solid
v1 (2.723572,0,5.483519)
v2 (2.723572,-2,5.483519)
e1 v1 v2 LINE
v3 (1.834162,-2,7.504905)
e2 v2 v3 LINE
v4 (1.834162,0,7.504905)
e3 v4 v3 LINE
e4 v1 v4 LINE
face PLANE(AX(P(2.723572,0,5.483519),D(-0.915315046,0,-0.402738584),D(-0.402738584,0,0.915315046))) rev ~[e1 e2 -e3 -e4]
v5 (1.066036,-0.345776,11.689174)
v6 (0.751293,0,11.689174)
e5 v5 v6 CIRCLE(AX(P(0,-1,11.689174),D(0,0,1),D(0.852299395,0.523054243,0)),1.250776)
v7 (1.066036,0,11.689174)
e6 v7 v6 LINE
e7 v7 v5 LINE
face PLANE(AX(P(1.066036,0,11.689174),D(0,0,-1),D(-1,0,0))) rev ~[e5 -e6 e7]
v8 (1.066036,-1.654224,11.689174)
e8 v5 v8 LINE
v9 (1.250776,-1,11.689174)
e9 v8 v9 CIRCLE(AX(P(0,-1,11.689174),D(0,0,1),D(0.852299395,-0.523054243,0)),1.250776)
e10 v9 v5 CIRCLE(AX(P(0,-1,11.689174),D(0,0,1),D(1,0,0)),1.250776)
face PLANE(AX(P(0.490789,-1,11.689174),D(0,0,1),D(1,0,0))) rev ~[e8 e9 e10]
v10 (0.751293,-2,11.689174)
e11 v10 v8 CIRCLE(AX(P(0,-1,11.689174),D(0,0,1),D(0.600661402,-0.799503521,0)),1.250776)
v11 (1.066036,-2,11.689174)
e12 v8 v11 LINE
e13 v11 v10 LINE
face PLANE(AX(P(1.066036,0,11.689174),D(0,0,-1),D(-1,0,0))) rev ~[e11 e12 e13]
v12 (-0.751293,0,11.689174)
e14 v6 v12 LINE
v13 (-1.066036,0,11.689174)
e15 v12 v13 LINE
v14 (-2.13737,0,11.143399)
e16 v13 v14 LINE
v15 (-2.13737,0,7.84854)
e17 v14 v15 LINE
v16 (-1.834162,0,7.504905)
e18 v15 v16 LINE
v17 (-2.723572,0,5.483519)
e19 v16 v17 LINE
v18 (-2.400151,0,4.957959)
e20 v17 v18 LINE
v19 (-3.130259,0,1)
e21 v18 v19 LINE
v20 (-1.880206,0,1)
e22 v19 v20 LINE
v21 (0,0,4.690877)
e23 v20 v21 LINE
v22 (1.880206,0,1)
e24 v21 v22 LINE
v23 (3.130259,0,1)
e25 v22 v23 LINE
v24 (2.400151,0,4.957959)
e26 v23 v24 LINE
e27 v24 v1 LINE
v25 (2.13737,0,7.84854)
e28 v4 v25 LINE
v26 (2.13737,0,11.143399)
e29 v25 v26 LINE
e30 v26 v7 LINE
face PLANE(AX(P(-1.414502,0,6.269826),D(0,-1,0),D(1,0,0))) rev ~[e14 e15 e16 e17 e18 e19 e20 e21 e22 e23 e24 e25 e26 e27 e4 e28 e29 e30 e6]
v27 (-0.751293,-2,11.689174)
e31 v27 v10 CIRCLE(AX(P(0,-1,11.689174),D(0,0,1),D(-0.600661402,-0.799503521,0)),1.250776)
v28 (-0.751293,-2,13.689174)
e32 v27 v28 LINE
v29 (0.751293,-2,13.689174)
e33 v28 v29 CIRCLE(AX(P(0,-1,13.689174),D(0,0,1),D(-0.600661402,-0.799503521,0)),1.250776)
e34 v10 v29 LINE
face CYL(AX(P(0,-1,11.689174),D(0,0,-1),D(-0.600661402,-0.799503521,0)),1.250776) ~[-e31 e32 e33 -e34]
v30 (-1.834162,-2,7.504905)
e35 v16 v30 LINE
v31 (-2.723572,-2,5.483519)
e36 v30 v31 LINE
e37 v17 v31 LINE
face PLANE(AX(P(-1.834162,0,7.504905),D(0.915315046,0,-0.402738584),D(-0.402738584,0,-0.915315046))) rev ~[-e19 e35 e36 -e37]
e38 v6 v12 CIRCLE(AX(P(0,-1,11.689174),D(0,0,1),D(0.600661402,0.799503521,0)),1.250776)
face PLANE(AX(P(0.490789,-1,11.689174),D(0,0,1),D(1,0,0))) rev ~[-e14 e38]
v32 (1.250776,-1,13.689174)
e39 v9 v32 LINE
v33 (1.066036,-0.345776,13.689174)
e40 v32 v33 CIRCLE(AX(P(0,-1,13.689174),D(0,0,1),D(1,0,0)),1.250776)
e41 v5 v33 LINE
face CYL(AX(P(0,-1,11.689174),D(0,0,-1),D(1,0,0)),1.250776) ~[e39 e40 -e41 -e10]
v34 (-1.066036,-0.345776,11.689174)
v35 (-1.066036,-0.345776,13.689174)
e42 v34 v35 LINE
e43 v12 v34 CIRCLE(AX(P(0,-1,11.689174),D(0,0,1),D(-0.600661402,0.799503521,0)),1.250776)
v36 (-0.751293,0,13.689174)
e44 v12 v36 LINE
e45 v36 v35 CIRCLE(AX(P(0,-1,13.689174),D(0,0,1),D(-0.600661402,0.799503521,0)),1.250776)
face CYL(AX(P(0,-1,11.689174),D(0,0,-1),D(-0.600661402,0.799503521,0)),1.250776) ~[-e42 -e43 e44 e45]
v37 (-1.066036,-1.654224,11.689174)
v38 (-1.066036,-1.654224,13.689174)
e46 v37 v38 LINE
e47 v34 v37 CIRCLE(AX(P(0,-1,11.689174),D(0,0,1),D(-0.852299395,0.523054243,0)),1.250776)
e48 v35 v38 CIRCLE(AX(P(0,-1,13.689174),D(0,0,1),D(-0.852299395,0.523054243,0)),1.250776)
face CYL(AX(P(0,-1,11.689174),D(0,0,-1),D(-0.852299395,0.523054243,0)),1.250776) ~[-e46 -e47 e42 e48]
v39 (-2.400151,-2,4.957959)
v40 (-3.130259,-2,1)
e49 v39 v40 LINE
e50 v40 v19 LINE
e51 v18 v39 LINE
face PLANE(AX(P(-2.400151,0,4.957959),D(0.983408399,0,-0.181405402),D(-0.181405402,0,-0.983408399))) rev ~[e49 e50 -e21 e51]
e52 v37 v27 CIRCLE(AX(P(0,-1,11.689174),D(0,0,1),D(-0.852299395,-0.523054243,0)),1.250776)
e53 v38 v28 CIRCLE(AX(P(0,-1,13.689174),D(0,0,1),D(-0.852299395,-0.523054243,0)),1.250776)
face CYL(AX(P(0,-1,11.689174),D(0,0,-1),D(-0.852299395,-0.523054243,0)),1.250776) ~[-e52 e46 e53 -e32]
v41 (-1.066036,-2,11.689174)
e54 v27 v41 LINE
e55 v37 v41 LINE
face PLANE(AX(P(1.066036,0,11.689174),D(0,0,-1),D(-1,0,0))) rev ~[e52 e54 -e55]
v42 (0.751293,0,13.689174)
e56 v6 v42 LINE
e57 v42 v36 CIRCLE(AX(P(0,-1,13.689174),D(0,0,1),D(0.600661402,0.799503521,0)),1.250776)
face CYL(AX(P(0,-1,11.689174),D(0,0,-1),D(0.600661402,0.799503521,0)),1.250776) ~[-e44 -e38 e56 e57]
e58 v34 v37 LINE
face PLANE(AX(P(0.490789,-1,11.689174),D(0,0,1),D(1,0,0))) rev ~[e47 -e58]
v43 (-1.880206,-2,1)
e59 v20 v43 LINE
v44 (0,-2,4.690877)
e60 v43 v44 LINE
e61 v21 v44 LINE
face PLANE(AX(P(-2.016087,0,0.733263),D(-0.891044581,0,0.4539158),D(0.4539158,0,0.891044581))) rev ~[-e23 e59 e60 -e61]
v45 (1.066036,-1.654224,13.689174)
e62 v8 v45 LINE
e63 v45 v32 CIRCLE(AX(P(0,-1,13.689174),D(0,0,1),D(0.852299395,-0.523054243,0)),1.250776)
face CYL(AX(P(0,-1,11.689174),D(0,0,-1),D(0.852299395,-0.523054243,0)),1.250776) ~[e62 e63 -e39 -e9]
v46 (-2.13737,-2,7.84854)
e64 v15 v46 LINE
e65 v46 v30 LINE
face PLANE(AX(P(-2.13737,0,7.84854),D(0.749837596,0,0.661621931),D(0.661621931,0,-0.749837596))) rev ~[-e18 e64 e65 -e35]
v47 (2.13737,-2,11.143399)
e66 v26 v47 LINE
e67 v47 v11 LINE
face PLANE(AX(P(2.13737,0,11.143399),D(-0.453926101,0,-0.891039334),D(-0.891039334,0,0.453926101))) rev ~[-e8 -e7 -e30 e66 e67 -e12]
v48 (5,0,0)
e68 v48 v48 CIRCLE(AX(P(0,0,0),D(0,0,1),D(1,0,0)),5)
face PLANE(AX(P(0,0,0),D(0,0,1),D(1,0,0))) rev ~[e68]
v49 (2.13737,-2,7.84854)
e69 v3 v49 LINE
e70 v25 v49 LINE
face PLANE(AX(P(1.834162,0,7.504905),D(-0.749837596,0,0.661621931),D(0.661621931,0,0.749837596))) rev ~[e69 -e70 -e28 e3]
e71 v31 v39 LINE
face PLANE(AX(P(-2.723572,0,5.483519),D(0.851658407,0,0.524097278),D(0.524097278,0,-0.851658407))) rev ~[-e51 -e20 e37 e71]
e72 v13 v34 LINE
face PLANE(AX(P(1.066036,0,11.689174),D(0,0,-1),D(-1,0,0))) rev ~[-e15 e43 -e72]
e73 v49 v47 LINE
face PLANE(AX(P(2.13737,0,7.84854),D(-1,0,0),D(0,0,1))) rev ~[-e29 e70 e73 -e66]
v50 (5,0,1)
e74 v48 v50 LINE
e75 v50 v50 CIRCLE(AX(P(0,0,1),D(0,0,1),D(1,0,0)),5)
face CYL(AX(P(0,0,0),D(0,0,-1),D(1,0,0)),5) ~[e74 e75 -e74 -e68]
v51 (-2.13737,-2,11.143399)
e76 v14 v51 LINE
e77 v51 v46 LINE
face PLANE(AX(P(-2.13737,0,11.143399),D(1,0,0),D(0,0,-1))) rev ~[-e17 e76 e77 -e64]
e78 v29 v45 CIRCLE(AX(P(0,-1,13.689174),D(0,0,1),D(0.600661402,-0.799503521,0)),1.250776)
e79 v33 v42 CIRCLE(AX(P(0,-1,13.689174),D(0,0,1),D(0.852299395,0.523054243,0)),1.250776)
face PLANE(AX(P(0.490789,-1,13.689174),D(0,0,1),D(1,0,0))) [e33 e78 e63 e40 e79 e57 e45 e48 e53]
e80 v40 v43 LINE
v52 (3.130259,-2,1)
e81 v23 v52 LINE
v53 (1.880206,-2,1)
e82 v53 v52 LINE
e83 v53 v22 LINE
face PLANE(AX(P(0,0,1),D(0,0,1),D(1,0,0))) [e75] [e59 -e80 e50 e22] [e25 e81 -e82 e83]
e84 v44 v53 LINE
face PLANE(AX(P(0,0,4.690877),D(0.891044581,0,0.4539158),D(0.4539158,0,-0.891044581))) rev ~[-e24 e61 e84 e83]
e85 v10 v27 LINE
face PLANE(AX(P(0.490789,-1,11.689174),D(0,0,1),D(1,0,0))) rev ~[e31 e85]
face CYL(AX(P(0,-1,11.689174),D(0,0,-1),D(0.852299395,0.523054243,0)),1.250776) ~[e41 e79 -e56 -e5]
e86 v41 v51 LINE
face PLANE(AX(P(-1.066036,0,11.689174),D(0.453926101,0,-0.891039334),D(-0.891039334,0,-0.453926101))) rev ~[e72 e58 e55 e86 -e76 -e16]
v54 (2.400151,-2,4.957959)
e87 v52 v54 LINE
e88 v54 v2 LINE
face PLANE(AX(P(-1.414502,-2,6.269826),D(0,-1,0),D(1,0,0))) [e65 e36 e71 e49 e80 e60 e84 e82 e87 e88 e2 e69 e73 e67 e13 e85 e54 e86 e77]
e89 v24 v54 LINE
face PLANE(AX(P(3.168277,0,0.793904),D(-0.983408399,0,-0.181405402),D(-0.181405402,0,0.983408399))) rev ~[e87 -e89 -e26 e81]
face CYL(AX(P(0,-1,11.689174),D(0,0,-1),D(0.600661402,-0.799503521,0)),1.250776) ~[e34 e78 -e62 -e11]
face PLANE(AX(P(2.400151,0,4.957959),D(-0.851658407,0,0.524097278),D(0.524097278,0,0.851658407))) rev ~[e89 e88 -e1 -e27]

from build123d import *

# Parameters (mm, degrees)
F0_R     = 5
F1_DEPTH = 1
F3_DEPTH = 2
F5_DEPTH = 2


with BuildPart() as f1:
    # F0 (on Top) → F1 (new body)
    with BuildSketch(Plane.XY):
        Circle(F0_R)
    extrude(amount=F1_DEPTH)

    # F2 (on Front) → F3 (join)
    with BuildSketch(Plane.XZ):
        Polygon((-2.4001505226, 4.9579590559), (-3.1682769768, 0.7939044153), (-2.0160870627, 0.7332628593), (0, 4.6908766963), (0, 11.689173989), (-1.0660358239, 11.689173989), (-2.1373701748, 11.1433994025), (-2.1373701748, 7.848540321), (-1.8341623945, 7.5049051084), (-2.7235720772, 5.4835192859), align=None)
        Polygon((0, 11.689173989), (0, 4.6908766963), (2.0160870627, 0.7332628593), (3.1682769768, 0.7939044153), (2.4001505226, 4.9579590559), (2.7235720772, 5.4835192859), (1.8341623945, 7.5049051084), (2.1373701748, 7.848540321), (2.1373701748, 11.1433994025), (1.0660358239, 11.689173989), align=None)
    extrude(amount=F3_DEPTH)

    # F4 (on face) → F5 (join)
    with BuildSketch(Plane.XY.offset(11.689173989)):
        with BuildLine():
            Line((0.7512930037, 0), (0, 0))
            Line((0, 0), (0, -2))
            Line((0, -2), (0.7512930037, -2))
            ThreePointArc((0.7512930037, -2), (0.9249655721, -1.8419500388), (1.0660358239, -1.6542238146))
            Line((1.0660358239, -1.6542238146), (1.0660358239, -0.3457761854))
            ThreePointArc((1.0660358239, -0.3457761854), (0.9249655721, -0.1580499612), (0.7512930037, 0))
        make_face()
        with BuildLine():
            Line((-0.7512930037, 0), (0, 0))
            Line((0, 0), (0.7512930037, 0))
            ThreePointArc((0.7512930037, 0), (0, 0.25077623), (-0.7512930037, 0))
        make_face()
        with BuildLine():
            Line((0, -2), (0, 0))
            Line((0, 0), (-0.7512930037, 0))
            ThreePointArc((-0.7512930037, 0), (-0.9249655721, -0.1580499612), (-1.0660358239, -0.3457761854))
            Line((-1.0660358239, -0.3457761854), (-1.0660358239, -1.6542238146))
            ThreePointArc((-1.0660358239, -1.6542238146), (-0.9249655721, -1.8419500388), (-0.7512930037, -2))
            Line((-0.7512930037, -2), (0, -2))
        make_face()
        with BuildLine():
            Line((0.7512930037, -2), (0, -2))
            Line((0, -2), (-0.7512930037, -2))
            ThreePointArc((-0.7512930037, -2), (0, -2.25077623), (0.7512930037, -2))
        make_face()
        with BuildLine():
            ThreePointArc((1.25077623, -1), (1.2037054138, -0.6600964044), (1.0660358239, -0.3457761854))
            Line((1.0660358239, -0.3457761854), (1.0660358239, -1.6542238146))
            ThreePointArc((1.0660358239, -1.6542238146), (1.2037054138, -1.3399035956), (1.25077623, -1))
        make_face()
        with BuildLine():
            Line((-1.0660358239, -1.6542238146), (-1.0660358239, -0.3457761854))
            ThreePointArc((-1.0660358239, -0.3457761854), (-1.25077623, -1), (-1.0660358239, -1.6542238146))
        make_face()
    extrude(amount=F5_DEPTH)


solid = f1.part
